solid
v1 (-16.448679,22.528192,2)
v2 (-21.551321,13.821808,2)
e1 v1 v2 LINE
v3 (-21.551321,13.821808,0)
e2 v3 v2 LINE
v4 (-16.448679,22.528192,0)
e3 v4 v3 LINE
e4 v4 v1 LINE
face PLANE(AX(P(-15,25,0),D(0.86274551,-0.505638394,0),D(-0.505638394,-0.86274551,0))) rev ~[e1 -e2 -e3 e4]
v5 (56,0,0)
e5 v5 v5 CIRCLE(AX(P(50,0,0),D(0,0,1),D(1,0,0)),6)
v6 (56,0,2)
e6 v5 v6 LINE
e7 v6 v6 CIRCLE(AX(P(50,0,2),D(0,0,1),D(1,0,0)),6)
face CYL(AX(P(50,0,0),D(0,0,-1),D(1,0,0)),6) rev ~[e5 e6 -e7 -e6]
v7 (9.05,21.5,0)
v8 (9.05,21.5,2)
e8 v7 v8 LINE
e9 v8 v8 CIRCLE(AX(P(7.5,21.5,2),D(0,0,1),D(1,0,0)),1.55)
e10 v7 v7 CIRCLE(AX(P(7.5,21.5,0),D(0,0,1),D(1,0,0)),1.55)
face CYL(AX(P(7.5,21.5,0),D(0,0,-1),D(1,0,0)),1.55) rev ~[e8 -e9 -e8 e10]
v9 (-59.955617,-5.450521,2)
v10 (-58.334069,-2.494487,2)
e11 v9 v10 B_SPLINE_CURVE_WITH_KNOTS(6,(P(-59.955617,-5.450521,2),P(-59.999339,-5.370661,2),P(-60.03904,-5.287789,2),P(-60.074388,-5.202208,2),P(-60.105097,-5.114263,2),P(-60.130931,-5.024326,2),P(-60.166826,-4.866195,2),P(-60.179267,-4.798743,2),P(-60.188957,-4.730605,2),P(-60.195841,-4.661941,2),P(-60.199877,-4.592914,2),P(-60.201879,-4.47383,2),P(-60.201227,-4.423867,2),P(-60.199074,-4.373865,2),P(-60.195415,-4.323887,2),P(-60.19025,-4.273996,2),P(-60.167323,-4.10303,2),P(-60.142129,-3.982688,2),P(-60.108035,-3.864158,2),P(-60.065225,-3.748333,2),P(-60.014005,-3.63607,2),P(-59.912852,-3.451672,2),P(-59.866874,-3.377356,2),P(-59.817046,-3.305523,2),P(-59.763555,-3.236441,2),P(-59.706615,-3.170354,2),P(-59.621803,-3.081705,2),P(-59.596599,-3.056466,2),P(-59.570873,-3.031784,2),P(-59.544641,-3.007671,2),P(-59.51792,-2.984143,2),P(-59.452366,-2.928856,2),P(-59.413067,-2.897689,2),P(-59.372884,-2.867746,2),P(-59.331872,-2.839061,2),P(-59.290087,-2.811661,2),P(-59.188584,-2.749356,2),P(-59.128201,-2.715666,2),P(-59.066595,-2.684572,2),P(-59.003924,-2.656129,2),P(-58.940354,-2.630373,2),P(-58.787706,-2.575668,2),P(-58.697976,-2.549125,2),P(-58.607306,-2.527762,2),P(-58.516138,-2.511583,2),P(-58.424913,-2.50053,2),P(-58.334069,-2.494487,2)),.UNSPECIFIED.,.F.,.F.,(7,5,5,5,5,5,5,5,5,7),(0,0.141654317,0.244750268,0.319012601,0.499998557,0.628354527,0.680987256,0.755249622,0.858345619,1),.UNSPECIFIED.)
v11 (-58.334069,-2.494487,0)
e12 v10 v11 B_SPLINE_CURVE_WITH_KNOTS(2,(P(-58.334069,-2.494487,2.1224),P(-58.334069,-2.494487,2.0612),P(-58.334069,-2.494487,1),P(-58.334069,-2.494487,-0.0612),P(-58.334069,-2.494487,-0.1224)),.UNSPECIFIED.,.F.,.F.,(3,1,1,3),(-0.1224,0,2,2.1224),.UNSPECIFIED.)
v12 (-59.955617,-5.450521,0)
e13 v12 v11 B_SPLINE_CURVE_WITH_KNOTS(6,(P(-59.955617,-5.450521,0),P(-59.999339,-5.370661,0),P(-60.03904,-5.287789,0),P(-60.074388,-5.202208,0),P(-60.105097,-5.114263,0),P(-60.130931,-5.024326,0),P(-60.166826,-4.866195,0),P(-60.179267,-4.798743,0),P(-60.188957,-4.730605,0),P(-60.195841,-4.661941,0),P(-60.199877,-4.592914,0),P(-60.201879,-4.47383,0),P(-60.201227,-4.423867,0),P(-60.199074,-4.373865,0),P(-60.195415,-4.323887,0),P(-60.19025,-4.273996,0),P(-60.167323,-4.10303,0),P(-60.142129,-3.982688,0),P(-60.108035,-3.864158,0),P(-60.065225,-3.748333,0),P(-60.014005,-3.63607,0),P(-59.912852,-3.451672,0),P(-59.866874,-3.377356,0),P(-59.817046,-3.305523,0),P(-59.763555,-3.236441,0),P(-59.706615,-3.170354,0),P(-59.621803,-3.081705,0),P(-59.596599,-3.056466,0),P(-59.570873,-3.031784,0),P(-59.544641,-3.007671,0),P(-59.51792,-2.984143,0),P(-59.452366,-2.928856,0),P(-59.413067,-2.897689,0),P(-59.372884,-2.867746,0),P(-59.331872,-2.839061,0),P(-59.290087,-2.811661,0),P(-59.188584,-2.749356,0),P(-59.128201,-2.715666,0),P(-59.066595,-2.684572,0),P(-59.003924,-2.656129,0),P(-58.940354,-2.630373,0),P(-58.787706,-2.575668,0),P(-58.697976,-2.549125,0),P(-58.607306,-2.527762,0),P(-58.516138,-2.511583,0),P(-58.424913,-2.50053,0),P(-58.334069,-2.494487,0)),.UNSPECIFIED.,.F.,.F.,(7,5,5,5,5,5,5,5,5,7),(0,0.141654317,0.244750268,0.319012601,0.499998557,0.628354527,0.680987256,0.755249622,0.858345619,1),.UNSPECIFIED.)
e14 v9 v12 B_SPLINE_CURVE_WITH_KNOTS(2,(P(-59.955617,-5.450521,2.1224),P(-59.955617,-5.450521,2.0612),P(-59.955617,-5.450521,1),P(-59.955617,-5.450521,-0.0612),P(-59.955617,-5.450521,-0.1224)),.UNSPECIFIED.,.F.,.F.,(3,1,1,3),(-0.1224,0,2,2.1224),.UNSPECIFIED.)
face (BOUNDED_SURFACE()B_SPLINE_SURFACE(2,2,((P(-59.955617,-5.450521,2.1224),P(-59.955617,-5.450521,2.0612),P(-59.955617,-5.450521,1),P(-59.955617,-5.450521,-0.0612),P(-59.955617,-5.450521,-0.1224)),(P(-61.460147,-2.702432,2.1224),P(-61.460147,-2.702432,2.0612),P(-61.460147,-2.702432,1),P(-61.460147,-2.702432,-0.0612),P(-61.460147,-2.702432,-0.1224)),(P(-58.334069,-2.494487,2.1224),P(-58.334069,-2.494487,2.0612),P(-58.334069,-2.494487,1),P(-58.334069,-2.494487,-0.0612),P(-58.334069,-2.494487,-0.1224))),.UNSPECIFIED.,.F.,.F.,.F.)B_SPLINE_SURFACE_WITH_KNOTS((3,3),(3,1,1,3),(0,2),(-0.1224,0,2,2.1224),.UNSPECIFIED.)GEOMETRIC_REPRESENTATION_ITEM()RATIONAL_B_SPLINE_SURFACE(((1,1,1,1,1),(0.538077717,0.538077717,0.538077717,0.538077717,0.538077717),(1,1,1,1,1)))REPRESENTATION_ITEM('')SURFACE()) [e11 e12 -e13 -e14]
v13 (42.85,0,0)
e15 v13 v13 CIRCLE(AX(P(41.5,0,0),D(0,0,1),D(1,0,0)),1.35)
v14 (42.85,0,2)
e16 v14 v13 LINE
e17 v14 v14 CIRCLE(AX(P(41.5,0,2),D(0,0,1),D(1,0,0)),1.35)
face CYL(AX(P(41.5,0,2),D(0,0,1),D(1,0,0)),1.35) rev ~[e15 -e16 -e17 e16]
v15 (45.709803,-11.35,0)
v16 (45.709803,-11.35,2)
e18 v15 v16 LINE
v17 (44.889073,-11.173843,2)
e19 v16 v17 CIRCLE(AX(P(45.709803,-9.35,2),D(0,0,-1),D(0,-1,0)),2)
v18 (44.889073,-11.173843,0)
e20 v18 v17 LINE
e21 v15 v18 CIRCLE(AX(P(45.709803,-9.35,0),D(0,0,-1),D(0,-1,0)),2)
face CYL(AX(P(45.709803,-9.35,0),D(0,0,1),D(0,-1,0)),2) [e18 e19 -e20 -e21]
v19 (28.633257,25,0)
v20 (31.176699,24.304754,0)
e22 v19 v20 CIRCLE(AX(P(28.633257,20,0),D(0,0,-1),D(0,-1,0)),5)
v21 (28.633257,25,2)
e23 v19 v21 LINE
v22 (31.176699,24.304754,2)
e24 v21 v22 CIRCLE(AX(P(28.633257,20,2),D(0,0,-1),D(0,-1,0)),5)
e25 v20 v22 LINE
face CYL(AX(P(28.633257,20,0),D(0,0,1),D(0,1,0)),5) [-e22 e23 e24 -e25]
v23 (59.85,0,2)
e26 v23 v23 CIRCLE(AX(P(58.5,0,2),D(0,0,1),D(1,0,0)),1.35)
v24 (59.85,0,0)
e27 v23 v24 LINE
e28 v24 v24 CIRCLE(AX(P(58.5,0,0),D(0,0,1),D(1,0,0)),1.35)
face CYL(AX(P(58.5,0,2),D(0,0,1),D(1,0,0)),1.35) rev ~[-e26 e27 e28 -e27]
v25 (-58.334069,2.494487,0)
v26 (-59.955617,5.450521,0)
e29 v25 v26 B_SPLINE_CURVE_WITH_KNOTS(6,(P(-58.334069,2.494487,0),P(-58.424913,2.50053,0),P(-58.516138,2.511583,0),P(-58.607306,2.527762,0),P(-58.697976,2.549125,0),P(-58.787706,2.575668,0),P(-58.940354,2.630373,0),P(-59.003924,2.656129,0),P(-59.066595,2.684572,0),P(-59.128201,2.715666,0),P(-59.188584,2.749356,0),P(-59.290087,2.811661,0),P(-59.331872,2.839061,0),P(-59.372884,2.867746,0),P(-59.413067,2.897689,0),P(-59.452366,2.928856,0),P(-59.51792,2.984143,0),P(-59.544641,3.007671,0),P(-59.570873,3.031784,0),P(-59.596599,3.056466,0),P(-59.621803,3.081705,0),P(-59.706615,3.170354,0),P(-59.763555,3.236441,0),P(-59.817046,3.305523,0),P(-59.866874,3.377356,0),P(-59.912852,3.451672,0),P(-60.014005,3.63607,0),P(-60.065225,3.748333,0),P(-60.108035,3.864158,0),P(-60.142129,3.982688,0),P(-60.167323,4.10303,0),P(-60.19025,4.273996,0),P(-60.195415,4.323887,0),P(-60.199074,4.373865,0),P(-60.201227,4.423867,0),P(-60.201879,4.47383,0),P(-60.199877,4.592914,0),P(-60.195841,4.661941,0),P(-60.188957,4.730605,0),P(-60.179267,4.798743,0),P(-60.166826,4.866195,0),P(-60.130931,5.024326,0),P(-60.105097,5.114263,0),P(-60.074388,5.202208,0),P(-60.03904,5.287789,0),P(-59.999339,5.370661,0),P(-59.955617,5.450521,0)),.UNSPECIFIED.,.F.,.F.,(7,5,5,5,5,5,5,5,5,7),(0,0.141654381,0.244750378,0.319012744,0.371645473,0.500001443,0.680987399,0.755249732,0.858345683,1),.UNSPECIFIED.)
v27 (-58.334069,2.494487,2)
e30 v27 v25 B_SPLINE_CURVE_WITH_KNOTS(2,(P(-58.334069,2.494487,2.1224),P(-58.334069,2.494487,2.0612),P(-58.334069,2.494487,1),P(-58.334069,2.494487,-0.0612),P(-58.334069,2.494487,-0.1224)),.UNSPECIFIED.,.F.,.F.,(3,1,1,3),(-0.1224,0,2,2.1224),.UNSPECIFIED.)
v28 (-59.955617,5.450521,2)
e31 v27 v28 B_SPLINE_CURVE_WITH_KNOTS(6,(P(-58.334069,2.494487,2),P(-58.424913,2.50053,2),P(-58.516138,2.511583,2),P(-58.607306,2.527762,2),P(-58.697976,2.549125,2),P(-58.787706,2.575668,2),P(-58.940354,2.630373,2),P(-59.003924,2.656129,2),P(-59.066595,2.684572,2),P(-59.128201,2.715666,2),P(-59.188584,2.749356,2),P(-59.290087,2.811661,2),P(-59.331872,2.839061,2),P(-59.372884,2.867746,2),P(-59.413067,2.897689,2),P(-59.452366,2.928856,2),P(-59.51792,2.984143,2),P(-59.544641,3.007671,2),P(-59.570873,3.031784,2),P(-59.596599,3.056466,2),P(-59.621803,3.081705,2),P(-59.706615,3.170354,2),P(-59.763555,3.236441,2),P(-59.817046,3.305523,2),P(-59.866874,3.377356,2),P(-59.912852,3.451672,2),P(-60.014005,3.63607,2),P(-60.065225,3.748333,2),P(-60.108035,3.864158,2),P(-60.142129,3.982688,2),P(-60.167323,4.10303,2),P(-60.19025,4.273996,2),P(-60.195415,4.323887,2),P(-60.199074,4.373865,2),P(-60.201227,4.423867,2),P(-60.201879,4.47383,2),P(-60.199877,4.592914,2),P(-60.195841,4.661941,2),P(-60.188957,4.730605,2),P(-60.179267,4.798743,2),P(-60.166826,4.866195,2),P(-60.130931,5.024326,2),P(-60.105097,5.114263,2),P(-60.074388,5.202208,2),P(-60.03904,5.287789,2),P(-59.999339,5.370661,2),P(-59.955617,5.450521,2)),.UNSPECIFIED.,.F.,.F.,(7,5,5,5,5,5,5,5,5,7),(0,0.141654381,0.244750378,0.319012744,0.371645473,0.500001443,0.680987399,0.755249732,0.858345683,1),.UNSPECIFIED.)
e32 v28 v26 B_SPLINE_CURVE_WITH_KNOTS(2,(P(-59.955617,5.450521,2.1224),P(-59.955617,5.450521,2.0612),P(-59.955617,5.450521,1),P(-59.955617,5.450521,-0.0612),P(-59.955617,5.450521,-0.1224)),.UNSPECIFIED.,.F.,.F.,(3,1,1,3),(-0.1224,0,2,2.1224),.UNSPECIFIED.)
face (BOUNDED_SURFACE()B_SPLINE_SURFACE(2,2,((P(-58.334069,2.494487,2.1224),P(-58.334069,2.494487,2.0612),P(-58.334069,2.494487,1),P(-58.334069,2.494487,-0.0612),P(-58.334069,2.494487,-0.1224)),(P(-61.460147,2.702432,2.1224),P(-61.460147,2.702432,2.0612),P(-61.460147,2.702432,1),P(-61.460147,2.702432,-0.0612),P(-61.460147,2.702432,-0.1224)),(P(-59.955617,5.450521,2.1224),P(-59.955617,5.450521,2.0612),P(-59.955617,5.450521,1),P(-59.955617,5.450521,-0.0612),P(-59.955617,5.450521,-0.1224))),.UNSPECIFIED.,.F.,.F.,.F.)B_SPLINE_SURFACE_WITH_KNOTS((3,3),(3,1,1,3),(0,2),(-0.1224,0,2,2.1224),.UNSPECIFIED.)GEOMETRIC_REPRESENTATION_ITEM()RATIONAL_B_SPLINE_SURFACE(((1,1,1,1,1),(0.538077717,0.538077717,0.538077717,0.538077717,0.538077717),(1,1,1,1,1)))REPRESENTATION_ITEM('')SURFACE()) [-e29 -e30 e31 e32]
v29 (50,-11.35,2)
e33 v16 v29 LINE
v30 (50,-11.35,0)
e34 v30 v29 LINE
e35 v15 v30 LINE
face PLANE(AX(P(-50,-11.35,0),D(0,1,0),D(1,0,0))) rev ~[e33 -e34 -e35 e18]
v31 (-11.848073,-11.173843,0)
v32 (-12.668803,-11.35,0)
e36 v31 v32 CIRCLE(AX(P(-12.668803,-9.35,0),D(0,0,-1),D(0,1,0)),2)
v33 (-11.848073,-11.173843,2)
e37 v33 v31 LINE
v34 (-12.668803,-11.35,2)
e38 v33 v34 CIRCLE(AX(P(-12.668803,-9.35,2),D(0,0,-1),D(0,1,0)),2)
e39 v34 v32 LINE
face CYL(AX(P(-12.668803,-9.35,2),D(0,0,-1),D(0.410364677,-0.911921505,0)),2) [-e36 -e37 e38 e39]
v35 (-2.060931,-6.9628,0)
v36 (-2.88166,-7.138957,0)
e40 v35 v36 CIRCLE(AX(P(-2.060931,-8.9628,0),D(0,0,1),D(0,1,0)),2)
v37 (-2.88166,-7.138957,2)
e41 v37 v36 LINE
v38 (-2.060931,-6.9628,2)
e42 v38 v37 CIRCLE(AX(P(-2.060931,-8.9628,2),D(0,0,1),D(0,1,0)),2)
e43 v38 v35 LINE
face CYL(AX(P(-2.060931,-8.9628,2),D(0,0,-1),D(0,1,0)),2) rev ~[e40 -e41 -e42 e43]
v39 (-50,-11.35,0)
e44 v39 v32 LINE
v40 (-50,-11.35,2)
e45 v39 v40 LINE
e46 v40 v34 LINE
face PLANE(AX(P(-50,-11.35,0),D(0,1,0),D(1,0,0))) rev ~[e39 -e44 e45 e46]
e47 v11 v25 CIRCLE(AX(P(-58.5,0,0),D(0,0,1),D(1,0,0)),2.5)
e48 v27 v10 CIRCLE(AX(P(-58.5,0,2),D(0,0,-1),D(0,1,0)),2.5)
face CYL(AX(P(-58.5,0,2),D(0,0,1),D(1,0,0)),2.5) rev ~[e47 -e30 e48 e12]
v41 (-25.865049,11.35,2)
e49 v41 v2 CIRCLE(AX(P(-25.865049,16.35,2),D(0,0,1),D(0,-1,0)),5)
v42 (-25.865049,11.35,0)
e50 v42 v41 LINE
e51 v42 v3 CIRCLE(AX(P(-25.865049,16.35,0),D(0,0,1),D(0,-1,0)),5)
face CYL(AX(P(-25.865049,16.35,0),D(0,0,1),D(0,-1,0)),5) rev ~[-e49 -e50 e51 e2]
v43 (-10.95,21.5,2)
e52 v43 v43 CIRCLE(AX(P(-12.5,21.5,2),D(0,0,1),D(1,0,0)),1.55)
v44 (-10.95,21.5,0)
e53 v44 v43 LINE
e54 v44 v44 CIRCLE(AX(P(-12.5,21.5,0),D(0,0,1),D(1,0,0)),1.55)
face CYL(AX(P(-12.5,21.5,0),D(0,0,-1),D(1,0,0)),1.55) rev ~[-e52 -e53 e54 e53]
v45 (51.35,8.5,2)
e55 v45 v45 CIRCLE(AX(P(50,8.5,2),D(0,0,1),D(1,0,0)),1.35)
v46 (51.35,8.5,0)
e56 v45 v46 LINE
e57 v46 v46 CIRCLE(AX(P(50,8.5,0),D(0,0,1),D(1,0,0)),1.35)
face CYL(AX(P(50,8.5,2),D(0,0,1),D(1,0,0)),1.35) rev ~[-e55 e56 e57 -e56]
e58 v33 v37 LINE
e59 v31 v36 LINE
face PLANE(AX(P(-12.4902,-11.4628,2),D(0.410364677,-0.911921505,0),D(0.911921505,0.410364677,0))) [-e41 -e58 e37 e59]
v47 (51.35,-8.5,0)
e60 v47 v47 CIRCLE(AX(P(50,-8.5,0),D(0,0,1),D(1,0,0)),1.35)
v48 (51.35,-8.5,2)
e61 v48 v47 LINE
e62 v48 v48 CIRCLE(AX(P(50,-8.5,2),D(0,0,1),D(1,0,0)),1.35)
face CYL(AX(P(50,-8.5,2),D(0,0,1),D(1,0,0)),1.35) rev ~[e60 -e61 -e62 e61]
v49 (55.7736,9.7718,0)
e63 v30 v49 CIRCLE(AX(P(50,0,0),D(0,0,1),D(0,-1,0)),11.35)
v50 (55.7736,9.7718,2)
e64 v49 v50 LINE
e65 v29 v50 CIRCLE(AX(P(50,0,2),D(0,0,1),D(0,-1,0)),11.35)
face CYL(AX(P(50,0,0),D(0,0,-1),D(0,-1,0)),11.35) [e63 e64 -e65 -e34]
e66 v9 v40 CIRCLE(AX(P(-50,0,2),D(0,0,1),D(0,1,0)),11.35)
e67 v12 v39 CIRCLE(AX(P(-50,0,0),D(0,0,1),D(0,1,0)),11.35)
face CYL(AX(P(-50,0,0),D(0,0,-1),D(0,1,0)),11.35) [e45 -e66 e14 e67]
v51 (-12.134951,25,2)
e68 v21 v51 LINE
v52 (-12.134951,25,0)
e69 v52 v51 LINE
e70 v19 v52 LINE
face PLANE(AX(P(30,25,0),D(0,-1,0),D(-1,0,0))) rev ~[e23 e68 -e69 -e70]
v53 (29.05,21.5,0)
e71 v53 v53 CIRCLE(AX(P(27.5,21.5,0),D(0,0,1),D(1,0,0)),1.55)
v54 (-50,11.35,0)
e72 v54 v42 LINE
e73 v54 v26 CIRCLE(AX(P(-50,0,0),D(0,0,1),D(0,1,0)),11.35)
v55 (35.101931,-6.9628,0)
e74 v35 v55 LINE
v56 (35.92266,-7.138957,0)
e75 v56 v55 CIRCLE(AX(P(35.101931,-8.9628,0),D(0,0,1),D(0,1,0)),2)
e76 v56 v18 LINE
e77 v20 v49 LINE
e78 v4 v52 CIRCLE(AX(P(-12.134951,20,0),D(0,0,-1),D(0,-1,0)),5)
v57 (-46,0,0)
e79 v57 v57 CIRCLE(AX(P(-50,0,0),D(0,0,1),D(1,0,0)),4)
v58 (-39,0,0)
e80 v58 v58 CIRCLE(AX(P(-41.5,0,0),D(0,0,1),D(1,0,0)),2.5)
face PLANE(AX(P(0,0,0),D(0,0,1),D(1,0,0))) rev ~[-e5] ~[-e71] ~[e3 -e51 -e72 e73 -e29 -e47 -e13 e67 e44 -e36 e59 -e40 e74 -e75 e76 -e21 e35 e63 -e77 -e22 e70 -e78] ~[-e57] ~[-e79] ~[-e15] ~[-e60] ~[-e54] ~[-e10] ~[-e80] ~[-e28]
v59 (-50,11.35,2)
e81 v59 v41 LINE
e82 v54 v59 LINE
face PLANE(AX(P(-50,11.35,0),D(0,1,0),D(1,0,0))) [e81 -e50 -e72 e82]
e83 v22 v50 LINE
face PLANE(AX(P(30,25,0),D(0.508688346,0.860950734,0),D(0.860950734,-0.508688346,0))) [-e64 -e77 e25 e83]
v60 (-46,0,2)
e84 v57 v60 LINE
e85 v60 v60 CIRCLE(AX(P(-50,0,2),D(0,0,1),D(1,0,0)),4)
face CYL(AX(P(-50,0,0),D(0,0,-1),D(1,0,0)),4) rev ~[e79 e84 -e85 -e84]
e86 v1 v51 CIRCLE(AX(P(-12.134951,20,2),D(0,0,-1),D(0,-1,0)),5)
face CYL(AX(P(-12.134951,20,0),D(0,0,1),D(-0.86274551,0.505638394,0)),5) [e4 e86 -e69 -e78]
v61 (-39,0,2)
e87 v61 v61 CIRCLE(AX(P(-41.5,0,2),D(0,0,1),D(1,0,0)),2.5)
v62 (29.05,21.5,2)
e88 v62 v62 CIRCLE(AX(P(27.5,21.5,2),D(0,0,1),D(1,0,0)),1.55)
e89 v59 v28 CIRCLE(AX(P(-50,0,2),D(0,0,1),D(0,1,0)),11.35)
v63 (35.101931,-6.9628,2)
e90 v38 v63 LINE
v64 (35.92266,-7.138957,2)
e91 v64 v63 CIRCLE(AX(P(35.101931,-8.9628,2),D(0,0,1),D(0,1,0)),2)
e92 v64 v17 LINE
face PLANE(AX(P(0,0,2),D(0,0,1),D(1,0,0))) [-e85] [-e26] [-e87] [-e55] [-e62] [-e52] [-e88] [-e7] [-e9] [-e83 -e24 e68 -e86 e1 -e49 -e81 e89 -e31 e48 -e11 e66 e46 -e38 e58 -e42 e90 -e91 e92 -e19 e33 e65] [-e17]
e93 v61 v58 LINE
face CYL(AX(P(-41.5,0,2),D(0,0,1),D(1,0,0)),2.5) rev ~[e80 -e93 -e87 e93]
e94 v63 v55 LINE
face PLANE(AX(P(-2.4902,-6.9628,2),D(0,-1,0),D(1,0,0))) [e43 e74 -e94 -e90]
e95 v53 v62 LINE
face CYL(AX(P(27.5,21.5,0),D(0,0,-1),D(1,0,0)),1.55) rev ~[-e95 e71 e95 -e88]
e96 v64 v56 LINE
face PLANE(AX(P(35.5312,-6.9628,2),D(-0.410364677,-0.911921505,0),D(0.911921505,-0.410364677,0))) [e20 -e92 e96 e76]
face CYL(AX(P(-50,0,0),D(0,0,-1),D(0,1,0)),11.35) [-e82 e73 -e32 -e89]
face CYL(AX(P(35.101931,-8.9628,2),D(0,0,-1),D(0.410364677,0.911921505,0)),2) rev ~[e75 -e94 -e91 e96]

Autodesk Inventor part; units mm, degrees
ref_plane "YZ Plane" through (0, 0, 0) normal (1, 0, 0) x (0, 1, 0)
ref_plane "XZ Plane" through (0, 0, 0) normal (0, 1, 0) x (-1, 0, 0)
ref_plane "XY Plane" through (0, 0, 0) normal (0, 0, 1) x (1, 0, 0)
sketch "スケッチ1" plane through (0, 0, 0) normal (0, 0, 1) x (1, 0, 0)
  line L0 (-50, 0) -> (50, 0) construction
  circle A0 centre (-50, 0) radius 4
  circle A1 centre (50, 0) radius 6
  line L1 (-50, 11.35) -> (-23, 11.35)
  line L2 (-50, -11.35) -> (50, -11.35)
  arc A2 (50, -11.35) -> (50, 11.35) centre (50, 0) ccw
  line L3 (30, 25) -> (-15, 25)
  line L4 (-15, 25) -> (-23, 11.35)
  line L5 (-19.1026, 18) -> (41.8474, 18) construction
  line L6 (-15, 25) -> (-15, 18) construction
  line L7 (30, 25) -> (30, 18) construction
  circle A3 centre (27.5, 21.5) radius 1.55
  circle A4 centre (-12.5, 21.5) radius 1.55
  circle A5 centre (7.5, 21.5) radius 1.55
  line L8 (-15, 21.5) -> (30, 21.5) construction
  line L9 (30, 24) -> (-15, 24) construction
  line L10 (-15, 24) -> (-15, 19) construction
  line L11 (-15, 19) -> (30, 19) construction
  line L12 (30, 19) -> (30, 24) construction
  line L13 (-23, 11.35) -> (50, 11.35)
  arc A6 (-50, 11.35) -> (-50, -11.35) centre (-50, 0) ccw
  line L14 (7.5, 25) -> (7.5, 18.5172) construction
  line L15 (30, 25) -> (55.7736, 9.7718)
  point P0 (0, 0)
  point P1 (0, 0)
  point P2 (55.7736, 9.7718)
  point P3 (38, 11.35)
  dimension "d0" = 100
  dimension "d1" = 8
  dimension "d8" = 12
  dimension "d10" = 7
  dimension "d11" = 45
  dimension "d12" = 2.5
  dimension "d13" = 3.1
  dimension "d14" = 2.5
  dimension "d15" = 20
  dimension "d17" = 5
  dimension "d18" = 19
  dimension "d69" = 11.35
  dimension "d72" = 11.35
  dimension "d87" = 8
  dimension "d88" = 8
extrude "押し出し1" add sketch "スケッチ1" along normal blind 2
fillet "フィレット1" radius 5 4 edges at (-23, 11.35, 1) (-15, 25, 1) (30, 25, 1) (-50, 11.35, 1)
sketch "スケッチ2" plane through (0, 0, 2) normal (0, 0, 1) x (1, 0, 0)
  arc A0 (50, -11.35) -> (55.7736, 9.7718) centre (50, 0) ccw projected
  line L0 (18, -20) -> (-35.4549, -20) construction
  line L1 (-76.9372, -11.5) -> (-72, -11.5)
  line L2 (-76.9372, -12.4) -> (-76.9372, -11.5)
  line L3 (-71.9872, -11.45) -> (-76.9872, -11.45)
  line L4 (-76.9872, -11.45) -> (-76.9872, -12.45)
  circle A1 centre (-50, 0) radius 4 projected
  circle A2 centre (-50, 0) radius 5.5 construction
  circle A3 centre (50, 0) radius 6 projected
  line L5 (83.3205, -17.7128) -> (50, 0) construction
  line L6 (50, 0) -> (18, -20) construction
  line L7 (83.3205, -17.7128) -> (37.8533, -17.7128) construction
  line L8 (-13.4166, -12.4128) -> (46.4577, -12.4128)
  line L9 (46.4577, -12.4128) -> (46.4577, -11.5128)
  line L10 (46.4577, -11.5128) -> (45.5205, -11.5128)
  line L11 (45.5205, -11.5128) -> (35.5205, -7.0128)
  line L12 (35.5205, -7.0128) -> (-2.4795, -7.0128)
  line L13 (-2.4795, -7.0128) -> (-12.4795, -11.5128)
  line L14 (-12.4795, -11.5128) -> (-13.4166, -11.5128)
  line L15 (-13.4166, -11.5128) -> (-13.4166, -12.4128)
  line L16 (-12.4902, -11.4628) -> (-2.4902, -6.9628)
  line L17 (-2.4902, -6.9628) -> (35.5312, -6.9628)
  line L18 (35.5312, -6.9628) -> (45.5312, -11.4628)
  line L19 (45.5312, -11.4628) -> (46.5077, -11.4628)
  line L20 (46.5077, -11.4628) -> (46.5077, -12.4628)
  line L21 (46.5077, -12.4628) -> (-13.4666, -12.4628)
  line L22 (-13.4666, -12.4628) -> (-13.4666, -11.4628)
  line L23 (-13.4666, -11.4628) -> (-12.4902, -11.4628)
  point P0 (56.6914, 9.1677)
  point P1 (0, 0)
  point P2 (50, 11.35)
  dimension "d19" = 20
  dimension "d20" = 32
  dimension "d32" = 11
  dimension "d33" = 120
  dimension "d37" = 37.8
  dimension "d38" = 6.2
  dimension "d39" = 0.05
  dimension "d49" = 38
  dimension "d50" = 10
  dimension "d51" = 10
  dimension "d52" = 4.5
  dimension "d53" = 0.9
  dimension "d54" = 59.9743
extrude "押し出し2" cut sketch "スケッチ2" against normal blind 10 contours L15 L14 L13 L12 L11 L10 L9 L8 | L16 L17 L18 L19 L20 L21 L22 L23
fillet "フィレット2" radius 2 4 edges at (45.2805, -11.35, 1) (-12.2395, -11.35, 1) (35.5312, -6.9628, 1) (-2.4902, -6.9628, 1)
sketch "スケッチ4" plane through (0, 0, 2) normal (0, 0, 1) x (1, 0, 0)
  circle A0 centre (50, 0) radius 6 projected
  circle A1 centre (50, 0) radius 8.5 construction
  line L0 (50, 0) -> (50, 8.5) construction
  circle A2 centre (50, 8.5) radius 1.35
  circle A3 centre (41.5, 0) radius 1.35
  circle A4 centre (50, -8.5) radius 1.35
  circle A5 centre (58.5, 0) radius 1.35
  point P0 (0, 0)
  dimension "d61" = 17
  dimension "d62" = 2.7
  dimension "d65" = 360
extrude "押し出し4" cut sketch "スケッチ4" against normal through all contours A2 | A3 | A4 | A5
sketch "スケッチ6" plane through (0, 0, 2) normal (0, 0, 1) x (1, 0, 0)
  circle A0 centre (-50, 0) radius 4 projected
  circle A1 centre (-50, 0) radius 8.5 construction
  circle A2 centre (-58.5, 0) radius 2.5
  line L0 (-50, 0) -> (-58.5, 0) construction
  line L1 (-50, 0) -> (-41.5, 0) construction
  circle A3 centre (-41.5, 0) radius 2.5
  arc A4 (-50, 11.35) -> (-50, -11.35) centre (-50, 0) ccw projected
  line L2 (-58.5, -2.5) -> (-61.0712, -2.5)
  line L3 (-58.5, 2.5) -> (-61.0712, 2.5)
  point P0 (0, 0)
  dimension "d78" = 17
  dimension "d79" = 5
  dimension "d82" = 360
extrude "押し出し6" cut sketch "スケッチ6" against normal through all contours A2 | A2 L2 A4 L3 | A3
fillet "フィレット4" radius 2 2 edges at (-61.0712, 2.5, 1) (-61.0712, -2.5, 1)
equation "\"d14\" = d12"
properties part number "Link_front_side_frame" material "GFRP"
